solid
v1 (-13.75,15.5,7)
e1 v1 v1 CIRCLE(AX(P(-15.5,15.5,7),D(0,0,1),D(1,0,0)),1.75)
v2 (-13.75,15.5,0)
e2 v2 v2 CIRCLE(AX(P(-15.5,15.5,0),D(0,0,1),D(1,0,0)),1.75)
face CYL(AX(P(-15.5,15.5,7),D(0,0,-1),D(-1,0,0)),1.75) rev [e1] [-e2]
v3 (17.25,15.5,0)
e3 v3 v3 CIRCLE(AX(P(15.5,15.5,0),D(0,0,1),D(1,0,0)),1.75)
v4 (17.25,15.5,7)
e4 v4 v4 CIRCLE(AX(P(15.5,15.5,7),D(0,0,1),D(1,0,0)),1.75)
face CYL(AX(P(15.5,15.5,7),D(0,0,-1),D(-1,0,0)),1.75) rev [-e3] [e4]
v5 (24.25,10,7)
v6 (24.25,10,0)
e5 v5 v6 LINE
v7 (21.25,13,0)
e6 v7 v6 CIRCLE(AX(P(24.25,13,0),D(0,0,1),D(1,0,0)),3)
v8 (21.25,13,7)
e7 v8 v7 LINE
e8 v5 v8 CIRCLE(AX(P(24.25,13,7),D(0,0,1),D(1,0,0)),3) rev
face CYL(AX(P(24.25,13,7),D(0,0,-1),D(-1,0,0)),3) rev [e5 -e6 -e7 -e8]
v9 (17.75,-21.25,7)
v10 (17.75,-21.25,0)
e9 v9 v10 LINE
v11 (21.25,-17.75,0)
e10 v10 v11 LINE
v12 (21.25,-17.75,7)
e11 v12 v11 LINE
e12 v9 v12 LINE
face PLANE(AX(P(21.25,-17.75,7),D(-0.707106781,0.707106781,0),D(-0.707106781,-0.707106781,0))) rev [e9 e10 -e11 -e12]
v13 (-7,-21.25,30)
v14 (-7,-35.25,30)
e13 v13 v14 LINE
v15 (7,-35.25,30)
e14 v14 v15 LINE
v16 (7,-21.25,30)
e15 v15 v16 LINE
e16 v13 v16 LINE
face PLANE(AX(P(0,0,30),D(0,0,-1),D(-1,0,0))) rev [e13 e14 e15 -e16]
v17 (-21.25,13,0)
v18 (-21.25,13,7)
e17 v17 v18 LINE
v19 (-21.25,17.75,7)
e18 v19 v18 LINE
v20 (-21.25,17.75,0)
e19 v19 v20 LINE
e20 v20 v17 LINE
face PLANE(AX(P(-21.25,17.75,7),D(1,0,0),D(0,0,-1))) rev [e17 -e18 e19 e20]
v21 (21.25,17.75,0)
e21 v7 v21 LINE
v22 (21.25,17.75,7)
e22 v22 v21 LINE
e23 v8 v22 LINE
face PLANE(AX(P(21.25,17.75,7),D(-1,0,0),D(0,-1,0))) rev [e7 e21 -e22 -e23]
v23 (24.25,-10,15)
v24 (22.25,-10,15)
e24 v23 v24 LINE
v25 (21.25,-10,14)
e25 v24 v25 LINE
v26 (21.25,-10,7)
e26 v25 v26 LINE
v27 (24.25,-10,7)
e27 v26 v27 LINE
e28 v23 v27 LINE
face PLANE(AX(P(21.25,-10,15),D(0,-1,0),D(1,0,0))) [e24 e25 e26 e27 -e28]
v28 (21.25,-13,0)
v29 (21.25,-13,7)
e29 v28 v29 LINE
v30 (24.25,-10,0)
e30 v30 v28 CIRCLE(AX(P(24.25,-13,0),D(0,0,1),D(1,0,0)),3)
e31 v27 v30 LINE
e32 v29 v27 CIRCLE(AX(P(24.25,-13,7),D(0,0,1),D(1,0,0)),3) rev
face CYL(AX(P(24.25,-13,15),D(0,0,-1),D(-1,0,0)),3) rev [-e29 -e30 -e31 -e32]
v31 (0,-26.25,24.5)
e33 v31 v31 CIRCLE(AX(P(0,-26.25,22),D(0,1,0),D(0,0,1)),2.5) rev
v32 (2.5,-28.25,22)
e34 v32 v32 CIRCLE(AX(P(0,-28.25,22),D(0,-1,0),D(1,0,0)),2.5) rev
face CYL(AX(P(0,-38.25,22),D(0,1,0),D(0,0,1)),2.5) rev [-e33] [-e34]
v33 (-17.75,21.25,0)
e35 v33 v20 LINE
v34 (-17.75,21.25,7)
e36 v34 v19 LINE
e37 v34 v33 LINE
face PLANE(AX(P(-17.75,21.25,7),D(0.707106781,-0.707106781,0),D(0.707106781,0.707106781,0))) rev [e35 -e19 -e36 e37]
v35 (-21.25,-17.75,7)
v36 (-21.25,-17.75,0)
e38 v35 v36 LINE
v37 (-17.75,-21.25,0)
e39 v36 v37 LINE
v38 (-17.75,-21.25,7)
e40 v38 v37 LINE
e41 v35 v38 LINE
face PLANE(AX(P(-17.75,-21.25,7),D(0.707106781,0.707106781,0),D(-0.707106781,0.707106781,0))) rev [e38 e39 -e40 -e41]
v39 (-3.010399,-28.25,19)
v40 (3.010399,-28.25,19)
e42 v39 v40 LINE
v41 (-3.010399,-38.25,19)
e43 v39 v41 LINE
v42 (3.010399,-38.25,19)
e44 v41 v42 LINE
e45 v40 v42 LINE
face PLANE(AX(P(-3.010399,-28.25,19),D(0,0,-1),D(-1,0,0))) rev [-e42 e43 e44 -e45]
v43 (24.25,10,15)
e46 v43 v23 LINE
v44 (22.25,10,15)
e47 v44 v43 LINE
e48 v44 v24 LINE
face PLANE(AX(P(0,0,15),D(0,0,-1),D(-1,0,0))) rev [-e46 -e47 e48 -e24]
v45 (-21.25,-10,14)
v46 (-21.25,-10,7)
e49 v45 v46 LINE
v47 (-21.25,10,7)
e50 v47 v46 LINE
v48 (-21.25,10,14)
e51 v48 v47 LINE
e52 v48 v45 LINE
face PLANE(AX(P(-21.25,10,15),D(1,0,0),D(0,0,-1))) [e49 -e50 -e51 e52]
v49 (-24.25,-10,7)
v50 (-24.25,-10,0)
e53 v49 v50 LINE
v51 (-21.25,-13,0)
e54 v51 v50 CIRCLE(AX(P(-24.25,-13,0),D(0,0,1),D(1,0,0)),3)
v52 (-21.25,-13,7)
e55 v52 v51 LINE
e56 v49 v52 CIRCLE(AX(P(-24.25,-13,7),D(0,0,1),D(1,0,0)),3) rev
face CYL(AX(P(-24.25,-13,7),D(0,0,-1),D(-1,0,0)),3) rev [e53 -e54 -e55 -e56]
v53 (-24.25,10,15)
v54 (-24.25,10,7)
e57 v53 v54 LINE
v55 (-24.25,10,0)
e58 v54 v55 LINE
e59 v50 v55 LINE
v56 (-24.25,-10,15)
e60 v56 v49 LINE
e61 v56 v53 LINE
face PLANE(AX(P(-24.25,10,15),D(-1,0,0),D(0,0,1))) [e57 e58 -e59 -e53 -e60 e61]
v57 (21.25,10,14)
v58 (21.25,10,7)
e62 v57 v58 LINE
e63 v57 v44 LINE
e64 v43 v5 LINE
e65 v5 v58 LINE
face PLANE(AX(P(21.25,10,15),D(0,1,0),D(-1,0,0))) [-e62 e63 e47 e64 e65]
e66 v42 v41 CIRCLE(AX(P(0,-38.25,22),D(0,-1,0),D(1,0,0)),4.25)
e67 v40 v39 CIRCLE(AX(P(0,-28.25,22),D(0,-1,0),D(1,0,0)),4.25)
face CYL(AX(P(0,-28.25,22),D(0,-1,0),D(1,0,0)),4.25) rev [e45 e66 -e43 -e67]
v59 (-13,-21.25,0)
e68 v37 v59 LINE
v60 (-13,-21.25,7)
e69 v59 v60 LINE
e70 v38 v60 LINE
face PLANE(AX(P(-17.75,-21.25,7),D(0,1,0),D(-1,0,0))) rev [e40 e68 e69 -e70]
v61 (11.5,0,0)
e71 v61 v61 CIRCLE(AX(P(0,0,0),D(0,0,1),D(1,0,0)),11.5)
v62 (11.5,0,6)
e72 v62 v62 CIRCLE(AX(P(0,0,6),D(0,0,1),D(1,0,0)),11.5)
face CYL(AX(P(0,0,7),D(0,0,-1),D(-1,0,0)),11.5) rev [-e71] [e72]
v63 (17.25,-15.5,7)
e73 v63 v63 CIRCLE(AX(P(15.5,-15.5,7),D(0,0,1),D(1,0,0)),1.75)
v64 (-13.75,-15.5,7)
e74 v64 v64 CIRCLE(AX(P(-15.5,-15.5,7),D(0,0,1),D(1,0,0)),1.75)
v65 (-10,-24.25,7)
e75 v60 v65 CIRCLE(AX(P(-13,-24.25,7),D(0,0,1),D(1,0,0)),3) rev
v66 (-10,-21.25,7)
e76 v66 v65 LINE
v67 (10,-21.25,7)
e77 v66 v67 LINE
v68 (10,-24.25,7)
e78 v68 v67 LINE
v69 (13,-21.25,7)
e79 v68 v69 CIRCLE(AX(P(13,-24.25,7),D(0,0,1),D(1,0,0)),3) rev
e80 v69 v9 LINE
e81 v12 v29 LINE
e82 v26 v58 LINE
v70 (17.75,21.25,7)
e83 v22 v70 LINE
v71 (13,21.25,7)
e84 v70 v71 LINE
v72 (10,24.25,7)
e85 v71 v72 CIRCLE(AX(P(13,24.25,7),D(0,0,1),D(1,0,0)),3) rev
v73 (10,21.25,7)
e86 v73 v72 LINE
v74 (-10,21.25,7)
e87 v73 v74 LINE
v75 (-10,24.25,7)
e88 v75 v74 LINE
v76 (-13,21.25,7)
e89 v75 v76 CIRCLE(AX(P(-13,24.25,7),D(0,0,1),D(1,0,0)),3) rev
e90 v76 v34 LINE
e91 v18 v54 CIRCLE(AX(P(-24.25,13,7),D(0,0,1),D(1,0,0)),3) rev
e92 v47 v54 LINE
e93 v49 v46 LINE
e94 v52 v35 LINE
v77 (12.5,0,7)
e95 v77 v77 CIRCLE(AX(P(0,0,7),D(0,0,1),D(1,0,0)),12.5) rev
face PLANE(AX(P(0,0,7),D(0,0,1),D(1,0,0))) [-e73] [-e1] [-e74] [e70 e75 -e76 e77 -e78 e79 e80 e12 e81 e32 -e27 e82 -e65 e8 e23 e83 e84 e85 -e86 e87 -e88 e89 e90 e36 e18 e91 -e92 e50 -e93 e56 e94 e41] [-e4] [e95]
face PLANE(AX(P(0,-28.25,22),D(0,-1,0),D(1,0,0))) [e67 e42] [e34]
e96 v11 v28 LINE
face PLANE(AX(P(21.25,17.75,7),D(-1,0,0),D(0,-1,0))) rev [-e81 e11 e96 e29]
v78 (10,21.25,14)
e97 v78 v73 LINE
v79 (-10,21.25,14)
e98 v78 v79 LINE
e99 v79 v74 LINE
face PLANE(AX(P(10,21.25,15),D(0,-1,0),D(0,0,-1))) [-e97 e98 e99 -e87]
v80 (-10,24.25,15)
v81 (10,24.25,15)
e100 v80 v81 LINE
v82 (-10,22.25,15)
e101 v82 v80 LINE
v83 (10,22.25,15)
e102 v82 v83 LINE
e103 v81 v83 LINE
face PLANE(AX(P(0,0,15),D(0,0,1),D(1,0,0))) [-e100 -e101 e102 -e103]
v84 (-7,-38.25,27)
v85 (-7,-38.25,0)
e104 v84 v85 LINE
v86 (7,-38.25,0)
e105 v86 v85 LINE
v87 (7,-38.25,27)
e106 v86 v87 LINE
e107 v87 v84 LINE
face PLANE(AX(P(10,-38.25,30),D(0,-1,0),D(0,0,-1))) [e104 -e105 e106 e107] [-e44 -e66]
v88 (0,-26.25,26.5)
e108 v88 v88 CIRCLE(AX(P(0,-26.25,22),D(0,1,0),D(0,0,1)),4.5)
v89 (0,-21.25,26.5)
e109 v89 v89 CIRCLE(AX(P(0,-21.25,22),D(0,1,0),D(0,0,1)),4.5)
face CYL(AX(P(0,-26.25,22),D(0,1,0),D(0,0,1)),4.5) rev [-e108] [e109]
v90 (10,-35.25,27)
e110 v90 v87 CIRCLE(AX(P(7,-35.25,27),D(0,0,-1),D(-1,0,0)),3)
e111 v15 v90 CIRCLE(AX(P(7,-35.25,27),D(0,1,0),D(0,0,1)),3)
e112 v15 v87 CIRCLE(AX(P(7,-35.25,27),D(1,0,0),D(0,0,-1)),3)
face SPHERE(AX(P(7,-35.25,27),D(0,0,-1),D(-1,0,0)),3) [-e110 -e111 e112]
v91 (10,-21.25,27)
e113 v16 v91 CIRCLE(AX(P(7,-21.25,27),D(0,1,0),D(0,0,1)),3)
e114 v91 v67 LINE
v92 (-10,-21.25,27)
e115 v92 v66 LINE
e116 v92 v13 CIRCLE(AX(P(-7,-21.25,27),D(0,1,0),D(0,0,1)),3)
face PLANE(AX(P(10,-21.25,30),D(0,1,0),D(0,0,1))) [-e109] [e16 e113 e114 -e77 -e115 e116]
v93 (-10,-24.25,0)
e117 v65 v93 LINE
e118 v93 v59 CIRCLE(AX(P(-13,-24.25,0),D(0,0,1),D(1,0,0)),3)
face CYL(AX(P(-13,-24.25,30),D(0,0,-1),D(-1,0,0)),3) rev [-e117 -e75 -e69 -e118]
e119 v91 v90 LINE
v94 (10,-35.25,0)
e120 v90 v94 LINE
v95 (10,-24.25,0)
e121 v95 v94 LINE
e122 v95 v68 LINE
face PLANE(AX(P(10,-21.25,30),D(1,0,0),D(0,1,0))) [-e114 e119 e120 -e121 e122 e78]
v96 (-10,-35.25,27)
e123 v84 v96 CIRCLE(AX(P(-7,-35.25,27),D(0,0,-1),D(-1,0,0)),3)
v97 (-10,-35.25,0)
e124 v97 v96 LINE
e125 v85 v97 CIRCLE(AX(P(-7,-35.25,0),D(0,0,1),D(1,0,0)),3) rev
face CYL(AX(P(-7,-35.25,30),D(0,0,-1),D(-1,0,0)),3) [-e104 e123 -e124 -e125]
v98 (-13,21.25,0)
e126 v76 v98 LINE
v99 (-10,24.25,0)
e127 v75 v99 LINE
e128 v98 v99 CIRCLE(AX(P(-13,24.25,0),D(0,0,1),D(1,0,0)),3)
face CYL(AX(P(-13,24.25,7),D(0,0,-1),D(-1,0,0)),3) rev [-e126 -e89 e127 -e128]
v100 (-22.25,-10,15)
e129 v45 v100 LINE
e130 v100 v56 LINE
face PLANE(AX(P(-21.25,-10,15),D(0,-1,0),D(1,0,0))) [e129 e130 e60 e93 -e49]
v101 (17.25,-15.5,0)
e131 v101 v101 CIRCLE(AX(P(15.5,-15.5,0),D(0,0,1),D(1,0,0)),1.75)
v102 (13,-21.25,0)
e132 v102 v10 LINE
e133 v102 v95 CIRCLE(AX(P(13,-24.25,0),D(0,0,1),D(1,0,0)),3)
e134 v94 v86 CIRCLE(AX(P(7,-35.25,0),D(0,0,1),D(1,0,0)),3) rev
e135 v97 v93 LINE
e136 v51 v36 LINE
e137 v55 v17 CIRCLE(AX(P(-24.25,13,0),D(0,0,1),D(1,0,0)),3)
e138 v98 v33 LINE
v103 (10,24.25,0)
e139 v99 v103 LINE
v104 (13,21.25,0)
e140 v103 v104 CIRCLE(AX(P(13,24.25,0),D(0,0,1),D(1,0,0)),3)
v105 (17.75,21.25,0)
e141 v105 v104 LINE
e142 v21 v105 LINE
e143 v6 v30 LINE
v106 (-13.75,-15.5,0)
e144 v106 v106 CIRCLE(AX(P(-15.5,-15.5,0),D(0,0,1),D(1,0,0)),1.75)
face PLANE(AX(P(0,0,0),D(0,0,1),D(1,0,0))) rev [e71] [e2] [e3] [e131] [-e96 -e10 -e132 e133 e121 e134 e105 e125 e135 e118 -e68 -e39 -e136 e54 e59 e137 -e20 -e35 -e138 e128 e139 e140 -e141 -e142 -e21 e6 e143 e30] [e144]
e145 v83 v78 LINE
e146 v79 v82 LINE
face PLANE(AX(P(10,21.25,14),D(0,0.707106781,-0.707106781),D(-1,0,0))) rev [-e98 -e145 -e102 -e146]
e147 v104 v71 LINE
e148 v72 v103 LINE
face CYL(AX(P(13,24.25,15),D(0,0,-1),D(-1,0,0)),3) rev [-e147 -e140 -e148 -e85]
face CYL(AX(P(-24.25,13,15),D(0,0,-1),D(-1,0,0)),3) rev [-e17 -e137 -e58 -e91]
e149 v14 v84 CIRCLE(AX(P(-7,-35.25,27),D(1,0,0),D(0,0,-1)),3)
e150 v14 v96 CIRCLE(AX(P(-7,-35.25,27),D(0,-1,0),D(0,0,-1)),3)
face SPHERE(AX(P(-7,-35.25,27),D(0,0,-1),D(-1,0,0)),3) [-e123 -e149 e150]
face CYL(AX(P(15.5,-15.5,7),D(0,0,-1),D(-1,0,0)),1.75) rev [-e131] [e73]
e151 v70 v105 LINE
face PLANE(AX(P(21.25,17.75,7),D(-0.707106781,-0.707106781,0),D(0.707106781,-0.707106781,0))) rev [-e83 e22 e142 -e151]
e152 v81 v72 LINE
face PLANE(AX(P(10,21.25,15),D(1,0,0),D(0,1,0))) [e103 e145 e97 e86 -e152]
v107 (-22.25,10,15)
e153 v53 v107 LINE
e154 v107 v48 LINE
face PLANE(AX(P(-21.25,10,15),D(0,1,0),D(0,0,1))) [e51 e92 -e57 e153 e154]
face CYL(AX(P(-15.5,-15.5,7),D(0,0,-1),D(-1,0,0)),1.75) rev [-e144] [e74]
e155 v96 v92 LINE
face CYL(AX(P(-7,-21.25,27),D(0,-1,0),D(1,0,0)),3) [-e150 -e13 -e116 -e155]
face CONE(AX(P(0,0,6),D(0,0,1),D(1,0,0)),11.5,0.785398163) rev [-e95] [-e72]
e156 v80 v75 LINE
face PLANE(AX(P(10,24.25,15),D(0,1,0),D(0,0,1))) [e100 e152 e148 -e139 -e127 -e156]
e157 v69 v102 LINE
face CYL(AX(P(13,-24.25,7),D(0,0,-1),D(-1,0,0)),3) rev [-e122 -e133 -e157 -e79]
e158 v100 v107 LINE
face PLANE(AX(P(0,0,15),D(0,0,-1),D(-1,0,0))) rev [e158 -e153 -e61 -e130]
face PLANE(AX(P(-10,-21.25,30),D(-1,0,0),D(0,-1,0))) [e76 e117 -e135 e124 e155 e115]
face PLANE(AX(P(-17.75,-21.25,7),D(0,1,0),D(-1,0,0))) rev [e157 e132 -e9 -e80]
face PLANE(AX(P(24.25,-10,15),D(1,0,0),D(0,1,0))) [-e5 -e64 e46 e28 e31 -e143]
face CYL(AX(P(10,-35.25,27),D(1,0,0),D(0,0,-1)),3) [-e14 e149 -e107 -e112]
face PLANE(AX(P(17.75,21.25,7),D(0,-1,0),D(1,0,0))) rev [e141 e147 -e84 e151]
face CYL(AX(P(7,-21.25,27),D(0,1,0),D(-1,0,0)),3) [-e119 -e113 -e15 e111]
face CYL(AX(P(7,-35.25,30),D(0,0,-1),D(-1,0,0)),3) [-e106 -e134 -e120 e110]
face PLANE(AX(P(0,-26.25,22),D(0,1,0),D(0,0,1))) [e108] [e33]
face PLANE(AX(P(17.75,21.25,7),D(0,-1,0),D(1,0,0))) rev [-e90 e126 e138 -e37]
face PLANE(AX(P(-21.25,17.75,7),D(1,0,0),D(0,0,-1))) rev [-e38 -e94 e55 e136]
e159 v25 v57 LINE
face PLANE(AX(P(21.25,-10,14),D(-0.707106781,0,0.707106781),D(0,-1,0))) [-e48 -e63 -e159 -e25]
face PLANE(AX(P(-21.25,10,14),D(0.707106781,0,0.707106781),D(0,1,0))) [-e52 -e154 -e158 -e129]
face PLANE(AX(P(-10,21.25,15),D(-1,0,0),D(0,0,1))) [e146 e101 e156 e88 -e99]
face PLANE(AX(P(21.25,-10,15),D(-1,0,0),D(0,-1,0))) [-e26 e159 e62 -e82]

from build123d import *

# Parameters (mm, degrees)
ESQUISSE1_R             = 11.5
ESQUISSE1_R_2           = 1.75
BOSS_EXTRU_1_DEPTH      = 7
ESQUISSE2_W             = 20
ESQUISSE2_H             = 3
ESQUISSE2_W_2           = 3
ESQUISSE2_H_2           = 20
BOSS_EXTRU_2_DEPTH      = 15
ESQUISSE3_W             = 20
ESQUISSE3_H             = 17
BOSS_EXTRU_3_DEPTH      = 30
ESQUISSE4_R             = 2.5
ENL_V_MAT_EXTRU_1_DEPTH = 60.651592602
ESQUISSE5_R             = 4.5
ENL_V_MAT_EXTRU_2_DEPTH = 5
ENL_V_MAT_EXTRU_3_DEPTH = 10
CONG_1_R                = 3
CONG_2_R                = 3
CHANFREIN1_SIZE         = 1


with BuildPart() as part:
    # Esquisse1 → Boss.-Extru.1 (new body)
    with BuildSketch(Plane.XY):
        Polygon((-17.749999999, 21.249999999), (-21.249999999, 17.749999999), (-21.249999999, -17.749999999), (-17.749999999, -21.250000001), (17.749999999, -21.250000001), (21.249999999, -17.749999999), (21.249999999, 17.749999999), (17.749999999, 21.249999999), align=None)
        Circle(ESQUISSE1_R, mode=Mode.SUBTRACT)
        with Locations((-15.5, 15.5)):
            Circle(ESQUISSE1_R_2, mode=Mode.SUBTRACT)
        with Locations((15.5, 15.5)):
            Circle(ESQUISSE1_R_2, mode=Mode.SUBTRACT)
        with Locations((15.5, -15.5)):
            Circle(ESQUISSE1_R_2, mode=Mode.SUBTRACT)
        with Locations((-15.5, -15.5)):
            Circle(ESQUISSE1_R_2, mode=Mode.SUBTRACT)
    extrude(amount=BOSS_EXTRU_1_DEPTH)

    # Esquisse2 → Boss.-Extru.2 (add)
    with BuildSketch(Plane(origin=(0, 0, 0), x_dir=(-1, 0, 0), z_dir=(0, 0, -1))):
        with Locations((0, 22.749999999)):
            Rectangle(ESQUISSE2_W, ESQUISSE2_H)
        with Locations((22.749999999, 0)):
            Rectangle(ESQUISSE2_W_2, ESQUISSE2_H_2)
        with Locations((-22.749999999, 0)):
            Rectangle(ESQUISSE2_W_2, ESQUISSE2_H_2)
    extrude(amount=-BOSS_EXTRU_2_DEPTH)

    # Esquisse3 → Boss.-Extru.3 (add)
    with BuildSketch(Plane(origin=(0, 0, 0), x_dir=(-1, 0, 0), z_dir=(0, 0, -1))):
        with Locations((0, -29.750000001)):
            Rectangle(ESQUISSE3_W, ESQUISSE3_H)
    extrude(amount=-BOSS_EXTRU_3_DEPTH)

    # Esquisse4 → Enlèv. mat.-Extru.1 (cut, through all)
    with BuildSketch(Plane(origin=(0, -21.250000001, 0), x_dir=(1, 0, 0), z_dir=(0, 1, 0))):
        with Locations(Location((0, -22, 0), (0, 0, 270))):
            Circle(ESQUISSE4_R)
    extrude(amount=-ENL_V_MAT_EXTRU_1_DEPTH, mode=Mode.SUBTRACT)

    # Esquisse5 → Enlèv. mat.-Extru.2 (cut)
    with BuildSketch(Plane(origin=(0, -21.250000001, 0), x_dir=(1, 0, 0), z_dir=(0, 1, 0))):
        with Locations(Location((0, -22, 0), (0, 0, 270))):
            Circle(ESQUISSE5_R)
    extrude(amount=-ENL_V_MAT_EXTRU_2_DEPTH, mode=Mode.SUBTRACT)

    # Esquisse6 → Enlèv. mat.-Extru.3 (cut)
    with BuildSketch(Plane(origin=(0, -38.250000001, 0), x_dir=(-1, 0, 0), z_dir=(0, -1, 0))):
        with BuildLine():
            Line((3.010398645, -19), (-3.010398645, -19))
            ThreePointArc((-3.010398645, -19), (0, -26.25), (3.010398645, -19))
        make_face()
    extrude(amount=-ENL_V_MAT_EXTRU_3_DEPTH, mode=Mode.SUBTRACT)

    # Congé1
    cong_1_edges = [part.edges().sort_by_distance(p)[0] for p in [
        (-21.249999999, -10, 3.5),
        (-21.249999999, 10, 3.5),
        (-10, 21.249999999, 3.5),
        (10, 21.249999999, 3.5),
        (21.249999999, 10, 3.5),
        (21.249999999, -10, 3.5),
        (-10, -38.250000001, 15),
        (10, -38.250000001, 15),
        (10, -21.250000001, 3.5),
        (-10, -21.250000001, 3.5),
    ]]
    fillet(cong_1_edges, radius=CONG_1_R - 0.0001)  # a hair under: the kernel refuses the full size

    # Congé2
    cong_2_edges = [part.edges().sort_by_distance(p)[0] for p in [
        (-10, -28.250050001, 30),
        (0, -38.250000001, 30),
        (9.121349633, -37.371349634, 30),
        (-9.121349633, -37.371349634, 30),
        (10, -28.250050001, 30),
    ]]
    fillet(cong_2_edges, radius=CONG_2_R - 0.0001)  # a hair under: the kernel refuses the full size

    # Chanfrein1
    chanfrein1_edges = [part.edges().sort_by_distance(p)[0] for p in [
        (-11.5, 0, 7),
        (0, 21.249999999, 15),
        (-21.249999999, 0, 15),
        (21.249999999, 0, 15),
    ]]
    chamfer(chanfrein1_edges, length=CHANFREIN1_SIZE)


solid = part.part
